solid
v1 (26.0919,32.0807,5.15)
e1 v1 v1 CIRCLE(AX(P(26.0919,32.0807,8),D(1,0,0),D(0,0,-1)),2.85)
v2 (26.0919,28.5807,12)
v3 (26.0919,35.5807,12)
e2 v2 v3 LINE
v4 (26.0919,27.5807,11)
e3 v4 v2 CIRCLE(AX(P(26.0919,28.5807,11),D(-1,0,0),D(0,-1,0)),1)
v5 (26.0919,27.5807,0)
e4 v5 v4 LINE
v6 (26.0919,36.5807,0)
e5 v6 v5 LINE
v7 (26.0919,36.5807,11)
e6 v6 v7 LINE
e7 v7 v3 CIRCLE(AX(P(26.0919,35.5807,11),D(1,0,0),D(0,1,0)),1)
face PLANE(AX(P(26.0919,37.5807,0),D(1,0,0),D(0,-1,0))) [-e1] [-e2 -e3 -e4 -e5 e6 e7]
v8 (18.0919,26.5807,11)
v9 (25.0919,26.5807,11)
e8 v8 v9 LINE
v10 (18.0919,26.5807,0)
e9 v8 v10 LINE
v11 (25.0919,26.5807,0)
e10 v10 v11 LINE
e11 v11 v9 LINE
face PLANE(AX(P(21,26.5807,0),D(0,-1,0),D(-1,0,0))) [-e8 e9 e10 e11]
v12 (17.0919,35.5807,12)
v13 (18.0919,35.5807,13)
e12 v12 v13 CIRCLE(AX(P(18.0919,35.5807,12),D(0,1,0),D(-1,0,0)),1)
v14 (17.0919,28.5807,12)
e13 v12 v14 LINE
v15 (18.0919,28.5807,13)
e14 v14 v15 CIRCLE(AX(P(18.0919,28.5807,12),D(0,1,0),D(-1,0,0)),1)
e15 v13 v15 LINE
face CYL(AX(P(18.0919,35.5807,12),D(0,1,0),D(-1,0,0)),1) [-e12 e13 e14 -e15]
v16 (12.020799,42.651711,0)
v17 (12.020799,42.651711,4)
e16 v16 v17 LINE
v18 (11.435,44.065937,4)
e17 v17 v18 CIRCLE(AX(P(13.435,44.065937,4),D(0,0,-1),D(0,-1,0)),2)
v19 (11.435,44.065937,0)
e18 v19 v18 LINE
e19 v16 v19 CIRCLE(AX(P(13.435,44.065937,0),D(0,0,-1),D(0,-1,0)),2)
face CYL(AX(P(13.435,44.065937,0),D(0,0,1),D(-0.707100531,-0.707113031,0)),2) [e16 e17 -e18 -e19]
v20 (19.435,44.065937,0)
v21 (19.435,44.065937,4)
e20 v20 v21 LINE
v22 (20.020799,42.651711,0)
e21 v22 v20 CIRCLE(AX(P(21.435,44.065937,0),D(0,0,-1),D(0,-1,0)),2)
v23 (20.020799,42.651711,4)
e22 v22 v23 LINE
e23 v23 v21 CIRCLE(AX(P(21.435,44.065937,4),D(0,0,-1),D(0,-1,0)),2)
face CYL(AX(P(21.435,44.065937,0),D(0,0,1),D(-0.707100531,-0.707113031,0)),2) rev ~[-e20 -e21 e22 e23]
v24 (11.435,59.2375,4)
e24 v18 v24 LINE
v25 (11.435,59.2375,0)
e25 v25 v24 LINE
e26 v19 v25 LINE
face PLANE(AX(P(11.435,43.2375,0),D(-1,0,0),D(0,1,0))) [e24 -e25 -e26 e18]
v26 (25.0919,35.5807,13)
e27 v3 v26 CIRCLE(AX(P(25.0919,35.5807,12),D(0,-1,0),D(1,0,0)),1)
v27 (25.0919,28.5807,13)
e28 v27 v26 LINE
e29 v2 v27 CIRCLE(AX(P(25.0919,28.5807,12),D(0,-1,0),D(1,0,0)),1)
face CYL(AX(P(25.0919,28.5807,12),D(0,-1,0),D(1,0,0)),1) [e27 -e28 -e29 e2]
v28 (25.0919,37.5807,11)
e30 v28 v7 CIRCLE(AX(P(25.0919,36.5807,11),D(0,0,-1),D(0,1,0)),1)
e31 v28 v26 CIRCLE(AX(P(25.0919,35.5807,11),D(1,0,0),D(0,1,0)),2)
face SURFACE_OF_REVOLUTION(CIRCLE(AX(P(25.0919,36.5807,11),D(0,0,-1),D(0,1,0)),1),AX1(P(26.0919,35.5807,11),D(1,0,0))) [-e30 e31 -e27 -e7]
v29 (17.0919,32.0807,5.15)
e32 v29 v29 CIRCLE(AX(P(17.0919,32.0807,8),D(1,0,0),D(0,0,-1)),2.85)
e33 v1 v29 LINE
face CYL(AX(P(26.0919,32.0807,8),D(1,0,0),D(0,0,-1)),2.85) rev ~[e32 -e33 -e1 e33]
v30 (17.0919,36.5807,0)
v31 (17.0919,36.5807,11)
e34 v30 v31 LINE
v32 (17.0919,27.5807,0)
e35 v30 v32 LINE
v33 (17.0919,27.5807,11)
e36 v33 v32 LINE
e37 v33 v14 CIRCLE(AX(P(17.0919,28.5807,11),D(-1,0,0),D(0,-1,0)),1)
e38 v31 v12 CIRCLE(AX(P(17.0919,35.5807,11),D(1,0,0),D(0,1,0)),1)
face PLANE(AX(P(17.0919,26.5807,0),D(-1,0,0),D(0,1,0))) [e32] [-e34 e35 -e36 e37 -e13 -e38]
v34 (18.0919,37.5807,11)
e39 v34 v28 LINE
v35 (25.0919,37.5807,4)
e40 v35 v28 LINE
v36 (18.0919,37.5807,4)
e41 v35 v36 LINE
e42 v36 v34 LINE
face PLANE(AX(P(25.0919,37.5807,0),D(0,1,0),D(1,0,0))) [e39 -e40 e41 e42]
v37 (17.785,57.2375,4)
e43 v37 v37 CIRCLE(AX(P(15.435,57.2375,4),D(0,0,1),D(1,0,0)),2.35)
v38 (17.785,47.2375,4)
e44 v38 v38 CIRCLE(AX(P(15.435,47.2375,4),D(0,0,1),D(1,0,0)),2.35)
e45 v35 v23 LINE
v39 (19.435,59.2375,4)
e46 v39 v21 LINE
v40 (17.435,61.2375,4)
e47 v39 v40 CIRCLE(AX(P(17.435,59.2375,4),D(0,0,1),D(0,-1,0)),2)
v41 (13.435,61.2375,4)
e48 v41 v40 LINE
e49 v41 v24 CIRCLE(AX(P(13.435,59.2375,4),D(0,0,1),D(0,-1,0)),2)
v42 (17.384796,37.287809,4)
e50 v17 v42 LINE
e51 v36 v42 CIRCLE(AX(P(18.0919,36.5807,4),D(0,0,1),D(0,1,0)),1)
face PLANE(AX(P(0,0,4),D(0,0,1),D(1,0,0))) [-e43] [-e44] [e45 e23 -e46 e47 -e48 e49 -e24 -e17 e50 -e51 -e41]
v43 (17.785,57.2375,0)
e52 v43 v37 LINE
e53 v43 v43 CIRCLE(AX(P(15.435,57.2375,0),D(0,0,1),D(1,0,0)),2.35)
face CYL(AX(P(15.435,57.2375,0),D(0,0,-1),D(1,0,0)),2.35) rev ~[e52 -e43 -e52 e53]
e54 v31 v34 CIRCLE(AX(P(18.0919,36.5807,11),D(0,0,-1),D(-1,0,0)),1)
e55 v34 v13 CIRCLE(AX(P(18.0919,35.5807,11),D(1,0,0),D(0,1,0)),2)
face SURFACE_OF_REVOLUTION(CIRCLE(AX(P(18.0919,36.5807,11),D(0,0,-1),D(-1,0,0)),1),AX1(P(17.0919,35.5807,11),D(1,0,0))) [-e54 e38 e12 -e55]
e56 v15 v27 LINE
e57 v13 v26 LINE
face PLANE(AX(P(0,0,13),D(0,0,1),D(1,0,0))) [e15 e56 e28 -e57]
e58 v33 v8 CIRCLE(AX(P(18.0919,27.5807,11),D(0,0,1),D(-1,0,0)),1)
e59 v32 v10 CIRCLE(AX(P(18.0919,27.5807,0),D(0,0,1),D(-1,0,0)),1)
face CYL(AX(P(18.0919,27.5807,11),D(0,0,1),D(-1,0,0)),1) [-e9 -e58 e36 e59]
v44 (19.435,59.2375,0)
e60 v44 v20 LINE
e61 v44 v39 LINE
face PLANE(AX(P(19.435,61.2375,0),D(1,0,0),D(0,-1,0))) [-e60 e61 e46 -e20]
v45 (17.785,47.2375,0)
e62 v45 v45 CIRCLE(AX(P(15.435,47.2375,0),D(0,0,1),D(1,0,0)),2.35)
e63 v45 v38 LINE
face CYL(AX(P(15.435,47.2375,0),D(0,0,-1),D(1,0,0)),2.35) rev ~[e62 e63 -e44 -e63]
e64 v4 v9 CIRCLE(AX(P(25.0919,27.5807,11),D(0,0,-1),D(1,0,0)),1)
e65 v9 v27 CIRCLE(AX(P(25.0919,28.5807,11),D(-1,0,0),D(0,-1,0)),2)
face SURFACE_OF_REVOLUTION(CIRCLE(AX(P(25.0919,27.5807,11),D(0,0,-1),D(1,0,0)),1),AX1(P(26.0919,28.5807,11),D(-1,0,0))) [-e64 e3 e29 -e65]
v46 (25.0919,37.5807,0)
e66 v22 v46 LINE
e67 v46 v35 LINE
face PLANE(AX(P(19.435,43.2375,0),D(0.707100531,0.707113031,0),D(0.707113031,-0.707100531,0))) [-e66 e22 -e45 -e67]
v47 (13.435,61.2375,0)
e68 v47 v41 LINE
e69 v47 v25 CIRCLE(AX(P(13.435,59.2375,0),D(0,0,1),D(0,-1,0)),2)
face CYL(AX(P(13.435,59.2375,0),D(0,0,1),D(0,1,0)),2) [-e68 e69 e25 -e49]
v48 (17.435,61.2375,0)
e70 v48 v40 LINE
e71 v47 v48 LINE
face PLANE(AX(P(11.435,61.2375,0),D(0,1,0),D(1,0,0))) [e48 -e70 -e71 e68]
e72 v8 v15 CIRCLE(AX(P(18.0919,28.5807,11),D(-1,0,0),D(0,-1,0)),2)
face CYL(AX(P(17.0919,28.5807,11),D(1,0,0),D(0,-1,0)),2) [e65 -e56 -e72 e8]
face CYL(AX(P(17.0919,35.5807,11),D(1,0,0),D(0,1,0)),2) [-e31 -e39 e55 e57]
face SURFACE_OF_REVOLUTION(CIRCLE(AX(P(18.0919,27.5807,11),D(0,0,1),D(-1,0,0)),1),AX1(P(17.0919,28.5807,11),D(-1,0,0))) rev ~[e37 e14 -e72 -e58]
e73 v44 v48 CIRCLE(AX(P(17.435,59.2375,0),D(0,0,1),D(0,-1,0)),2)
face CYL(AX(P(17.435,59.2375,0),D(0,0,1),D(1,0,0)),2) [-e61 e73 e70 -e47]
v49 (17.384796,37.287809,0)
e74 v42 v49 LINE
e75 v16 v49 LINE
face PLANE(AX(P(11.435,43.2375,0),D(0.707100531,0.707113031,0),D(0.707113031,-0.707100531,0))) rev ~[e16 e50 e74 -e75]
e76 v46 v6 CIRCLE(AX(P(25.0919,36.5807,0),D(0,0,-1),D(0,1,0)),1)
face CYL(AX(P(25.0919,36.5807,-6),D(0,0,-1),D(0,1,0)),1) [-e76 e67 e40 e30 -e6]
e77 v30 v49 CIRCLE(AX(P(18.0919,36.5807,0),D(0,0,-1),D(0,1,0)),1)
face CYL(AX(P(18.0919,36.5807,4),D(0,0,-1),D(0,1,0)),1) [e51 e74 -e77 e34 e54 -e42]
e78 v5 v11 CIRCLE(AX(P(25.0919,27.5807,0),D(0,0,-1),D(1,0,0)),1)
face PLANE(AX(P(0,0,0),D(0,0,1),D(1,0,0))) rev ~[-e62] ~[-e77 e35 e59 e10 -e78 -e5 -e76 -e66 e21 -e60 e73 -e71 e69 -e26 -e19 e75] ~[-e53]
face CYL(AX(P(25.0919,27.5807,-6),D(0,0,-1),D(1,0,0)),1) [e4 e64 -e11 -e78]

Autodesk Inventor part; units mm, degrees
ref_plane "YZ Plane" through (0, 0, 0) normal (1, 0, 0) x (0, 1, 0)
ref_plane "XZ Plane" through (0, 0, 0) normal (0, 1, 0) x (-1, 0, 0)
ref_plane "XY Plane" through (0, 0, 0) normal (0, 0, 1) x (1, 0, 0)
ref_plane "Work Plane1" through (0, 0, 0) normal (0, 0, 1) x (1, 0, 0)
sketch "Sketch1" plane through (0, 0, 0) normal (0, 0, 1) x (1, 0, 0)
  circle A0 centre (-15.435, 47.2375) radius 1.95 projected
  circle A1 centre (-15.435, 57.2375) radius 1.95 projected
  circle A2 centre (15.435, 47.2375) radius 1.95 projected
  circle A3 centre (15.435, 57.2375) radius 1.95 projected
  circle A4 centre (0, -62.5) radius 13.5 projected
  circle A5 centre (0, -43.5) radius 2 projected
  circle A6 centre (-13.435, -49.065) radius 2 projected
  circle A7 centre (13.435, -49.065) radius 2 projected
  circle A8 centre (-13.435, -75.935) radius 2 projected
  arc A9 (-14.8492, -77.3492) -> (0, -83.5) centre (0, -62.5) ccw projected
  circle A10 centre (0, -81.5) radius 2 projected
  arc A11 (0, -83.5) -> (14.8492, -77.3492) centre (0, -62.5) ccw projected
  circle A12 centre (13.435, -75.935) radius 2 projected
  arc A13 (14.8492, -77.3492) -> (21, -62.5) centre (0, -62.5) ccw projected
  circle A14 centre (19, -62.5) radius 2 projected
  line L0 (21, 62.5) -> (21, -62.5) projected
  arc A15 (21, 62.5) -> (-21, 62.5) centre (0, 62.5) ccw projected
  line L1 (-21, -62.5) -> (-21, 62.5) projected
  circle A16 centre (-19, -62.5) radius 2 projected
  arc A17 (-21, -62.5) -> (-14.8492, -77.3492) centre (0, -62.5) ccw projected
  circle A18 centre (-15.5, -1.9727) radius 2.1 projected
  circle A19 centre (15.5, -1.9727) radius 2.1 projected
  circle A20 centre (-15.5, 29.0273) radius 2.1 projected
  circle A21 centre (15.5, 29.0273) radius 2.1 projected
  circle A22 centre (0, 13.5273) radius 13 projected
  line L2 (11.435, 61.2375) -> (19.435, 61.2375)
  line L3 (19.435, 61.2375) -> (19.435, 43.2375)
  line L4 (19.435, 43.2375) -> (11.435, 43.2375)
  line L5 (11.435, 43.2375) -> (11.435, 61.2375)
  circle A23 centre (15.435, 57.2375) radius 2.35
  circle A24 centre (15.435, 47.2375) radius 2.35
  line L6 (11.435, 43.2375) -> (17.0919, 37.5807)
  line L7 (11.435, 43.2375) -> (19.435, 43.2375) construction
  line L8 (19.435, 43.2375) -> (25.0919, 37.5807)
  line L9 (17.0919, 37.5807) -> (26.0919, 37.5807)
  line L10 (26.0919, 37.5807) -> (26.0919, 26.5807)
  line L11 (26.0919, 26.5807) -> (17.0919, 26.5807)
  line L12 (17.0919, 26.5807) -> (17.0919, 37.5807)
  point P0 (0, 0)
  dimension "d0" = 4
  dimension "d1" = 4
  dimension "d2" = 4
  dimension "d3" = 4
  dimension "d4" = 0.4
  dimension "d5" = 0.4
  dimension "d6" = 8
  dimension "d7" = 45
  dimension "d8" = 11
  dimension "d19" = 9
extrude "Extrusion1" add sketch "Sketch1" along normal blind 4 contours L11 L12 A21 L9 L0 | L0 L9 L10 L11 | L8 L9 L0 | L0 L9 L6 L4 L8 | L4 L5 L2 L3 | L12 A21 picked at (17.2417, 29.1915)
sketch "Sketch2" plane through (0, 0, 4) normal (0, 0, 1) x (1, 0, 0)
  line L0 (19.435, 61.2375) -> (11.435, 61.2375) projected
  line L1 (11.435, 61.2375) -> (11.435, 43.2375) projected
  line L2 (11.435, 43.2375) -> (17.0919, 37.5807) projected
  line L3 (17.0919, 37.5807) -> (17.0919, 26.5807) projected
  line L4 (17.0919, 26.5807) -> (26.0919, 26.5807) projected
  line L5 (26.0919, 26.5807) -> (26.0919, 37.5807) projected
  line L6 (25.0919, 37.5807) -> (19.435, 43.2375) projected
  line L7 (19.435, 43.2375) -> (19.435, 61.2375) projected
  circle A0 centre (15.435, 47.2375) radius 2.35 projected
  circle A1 centre (15.435, 57.2375) radius 2.35 projected
  line L8 (17.0919, 26.5807) -> (25.0919, 26.5807)
  line L9 (25.0919, 26.5807) -> (25.0919, 37.5807)
  line L10 (25.0919, 37.5807) -> (17.0919, 37.5807)
  line L11 (17.0919, 37.5807) -> (17.0919, 26.5807)
  line L12 (26.0919, 37.5807) -> (25.0919, 37.5807) projected
  point P0 (0, 0)
  point P1 (25.0919, 26.5807)
extrude "Extrusion2" add sketch "Sketch2" along normal blind 9 contours L12 L5 L4 L9 | L9 L4 L3 L10
sketch "Sketch3" plane through (26.0919, 26.5807, 0) normal (1, 0, 0) x (0, 0, -1)
  line L0 (0, 0) -> (0, 11) projected
  line L1 (-13, 0) -> (-13, 11) projected
  line L2 (0, 0) -> (-13, 0) projected
  circle A0 centre (-8, 5.5) radius 2.85
  line L3 (0, 11) -> (-13, 11) projected
  point P0 (0, -26.5807)
  dimension "d13" = 8
  dimension "d14" = 5.5
  dimension "d15" = 5.7
fillet "Fillet1" radius 2 4 edges at (11.435, 43.2375, 2) (11.435, 61.2375, 2) (19.435, 61.2375, 2) (19.435, 43.2375, 2)
extrude "Extrusion3" cut sketch "Sketch3" against normal through all contours A0
fillet "Fillet2" radius 2 2 edges at (21.5919, 37.5807, 13) (21.5919, 26.5807, 13)
fillet "Fillet3" radius 1 10 edges at (17.0919, 27.1665, 12.4142) (17.0919, 32.0807, 13) (17.0919, 36.9949, 12.4142) (17.0919, 37.5807, 7.5) (17.0919, 26.5807, 5.5) (26.0919, 27.1665, 12.4142) (26.0919, 32.0807, 13) (26.0919, 36.9949, 12.4142) (26.0919, 37.5807, 5.5) (26.0919, 26.5807, 5.5)
properties part number "top-tensioner_3DPrint"
